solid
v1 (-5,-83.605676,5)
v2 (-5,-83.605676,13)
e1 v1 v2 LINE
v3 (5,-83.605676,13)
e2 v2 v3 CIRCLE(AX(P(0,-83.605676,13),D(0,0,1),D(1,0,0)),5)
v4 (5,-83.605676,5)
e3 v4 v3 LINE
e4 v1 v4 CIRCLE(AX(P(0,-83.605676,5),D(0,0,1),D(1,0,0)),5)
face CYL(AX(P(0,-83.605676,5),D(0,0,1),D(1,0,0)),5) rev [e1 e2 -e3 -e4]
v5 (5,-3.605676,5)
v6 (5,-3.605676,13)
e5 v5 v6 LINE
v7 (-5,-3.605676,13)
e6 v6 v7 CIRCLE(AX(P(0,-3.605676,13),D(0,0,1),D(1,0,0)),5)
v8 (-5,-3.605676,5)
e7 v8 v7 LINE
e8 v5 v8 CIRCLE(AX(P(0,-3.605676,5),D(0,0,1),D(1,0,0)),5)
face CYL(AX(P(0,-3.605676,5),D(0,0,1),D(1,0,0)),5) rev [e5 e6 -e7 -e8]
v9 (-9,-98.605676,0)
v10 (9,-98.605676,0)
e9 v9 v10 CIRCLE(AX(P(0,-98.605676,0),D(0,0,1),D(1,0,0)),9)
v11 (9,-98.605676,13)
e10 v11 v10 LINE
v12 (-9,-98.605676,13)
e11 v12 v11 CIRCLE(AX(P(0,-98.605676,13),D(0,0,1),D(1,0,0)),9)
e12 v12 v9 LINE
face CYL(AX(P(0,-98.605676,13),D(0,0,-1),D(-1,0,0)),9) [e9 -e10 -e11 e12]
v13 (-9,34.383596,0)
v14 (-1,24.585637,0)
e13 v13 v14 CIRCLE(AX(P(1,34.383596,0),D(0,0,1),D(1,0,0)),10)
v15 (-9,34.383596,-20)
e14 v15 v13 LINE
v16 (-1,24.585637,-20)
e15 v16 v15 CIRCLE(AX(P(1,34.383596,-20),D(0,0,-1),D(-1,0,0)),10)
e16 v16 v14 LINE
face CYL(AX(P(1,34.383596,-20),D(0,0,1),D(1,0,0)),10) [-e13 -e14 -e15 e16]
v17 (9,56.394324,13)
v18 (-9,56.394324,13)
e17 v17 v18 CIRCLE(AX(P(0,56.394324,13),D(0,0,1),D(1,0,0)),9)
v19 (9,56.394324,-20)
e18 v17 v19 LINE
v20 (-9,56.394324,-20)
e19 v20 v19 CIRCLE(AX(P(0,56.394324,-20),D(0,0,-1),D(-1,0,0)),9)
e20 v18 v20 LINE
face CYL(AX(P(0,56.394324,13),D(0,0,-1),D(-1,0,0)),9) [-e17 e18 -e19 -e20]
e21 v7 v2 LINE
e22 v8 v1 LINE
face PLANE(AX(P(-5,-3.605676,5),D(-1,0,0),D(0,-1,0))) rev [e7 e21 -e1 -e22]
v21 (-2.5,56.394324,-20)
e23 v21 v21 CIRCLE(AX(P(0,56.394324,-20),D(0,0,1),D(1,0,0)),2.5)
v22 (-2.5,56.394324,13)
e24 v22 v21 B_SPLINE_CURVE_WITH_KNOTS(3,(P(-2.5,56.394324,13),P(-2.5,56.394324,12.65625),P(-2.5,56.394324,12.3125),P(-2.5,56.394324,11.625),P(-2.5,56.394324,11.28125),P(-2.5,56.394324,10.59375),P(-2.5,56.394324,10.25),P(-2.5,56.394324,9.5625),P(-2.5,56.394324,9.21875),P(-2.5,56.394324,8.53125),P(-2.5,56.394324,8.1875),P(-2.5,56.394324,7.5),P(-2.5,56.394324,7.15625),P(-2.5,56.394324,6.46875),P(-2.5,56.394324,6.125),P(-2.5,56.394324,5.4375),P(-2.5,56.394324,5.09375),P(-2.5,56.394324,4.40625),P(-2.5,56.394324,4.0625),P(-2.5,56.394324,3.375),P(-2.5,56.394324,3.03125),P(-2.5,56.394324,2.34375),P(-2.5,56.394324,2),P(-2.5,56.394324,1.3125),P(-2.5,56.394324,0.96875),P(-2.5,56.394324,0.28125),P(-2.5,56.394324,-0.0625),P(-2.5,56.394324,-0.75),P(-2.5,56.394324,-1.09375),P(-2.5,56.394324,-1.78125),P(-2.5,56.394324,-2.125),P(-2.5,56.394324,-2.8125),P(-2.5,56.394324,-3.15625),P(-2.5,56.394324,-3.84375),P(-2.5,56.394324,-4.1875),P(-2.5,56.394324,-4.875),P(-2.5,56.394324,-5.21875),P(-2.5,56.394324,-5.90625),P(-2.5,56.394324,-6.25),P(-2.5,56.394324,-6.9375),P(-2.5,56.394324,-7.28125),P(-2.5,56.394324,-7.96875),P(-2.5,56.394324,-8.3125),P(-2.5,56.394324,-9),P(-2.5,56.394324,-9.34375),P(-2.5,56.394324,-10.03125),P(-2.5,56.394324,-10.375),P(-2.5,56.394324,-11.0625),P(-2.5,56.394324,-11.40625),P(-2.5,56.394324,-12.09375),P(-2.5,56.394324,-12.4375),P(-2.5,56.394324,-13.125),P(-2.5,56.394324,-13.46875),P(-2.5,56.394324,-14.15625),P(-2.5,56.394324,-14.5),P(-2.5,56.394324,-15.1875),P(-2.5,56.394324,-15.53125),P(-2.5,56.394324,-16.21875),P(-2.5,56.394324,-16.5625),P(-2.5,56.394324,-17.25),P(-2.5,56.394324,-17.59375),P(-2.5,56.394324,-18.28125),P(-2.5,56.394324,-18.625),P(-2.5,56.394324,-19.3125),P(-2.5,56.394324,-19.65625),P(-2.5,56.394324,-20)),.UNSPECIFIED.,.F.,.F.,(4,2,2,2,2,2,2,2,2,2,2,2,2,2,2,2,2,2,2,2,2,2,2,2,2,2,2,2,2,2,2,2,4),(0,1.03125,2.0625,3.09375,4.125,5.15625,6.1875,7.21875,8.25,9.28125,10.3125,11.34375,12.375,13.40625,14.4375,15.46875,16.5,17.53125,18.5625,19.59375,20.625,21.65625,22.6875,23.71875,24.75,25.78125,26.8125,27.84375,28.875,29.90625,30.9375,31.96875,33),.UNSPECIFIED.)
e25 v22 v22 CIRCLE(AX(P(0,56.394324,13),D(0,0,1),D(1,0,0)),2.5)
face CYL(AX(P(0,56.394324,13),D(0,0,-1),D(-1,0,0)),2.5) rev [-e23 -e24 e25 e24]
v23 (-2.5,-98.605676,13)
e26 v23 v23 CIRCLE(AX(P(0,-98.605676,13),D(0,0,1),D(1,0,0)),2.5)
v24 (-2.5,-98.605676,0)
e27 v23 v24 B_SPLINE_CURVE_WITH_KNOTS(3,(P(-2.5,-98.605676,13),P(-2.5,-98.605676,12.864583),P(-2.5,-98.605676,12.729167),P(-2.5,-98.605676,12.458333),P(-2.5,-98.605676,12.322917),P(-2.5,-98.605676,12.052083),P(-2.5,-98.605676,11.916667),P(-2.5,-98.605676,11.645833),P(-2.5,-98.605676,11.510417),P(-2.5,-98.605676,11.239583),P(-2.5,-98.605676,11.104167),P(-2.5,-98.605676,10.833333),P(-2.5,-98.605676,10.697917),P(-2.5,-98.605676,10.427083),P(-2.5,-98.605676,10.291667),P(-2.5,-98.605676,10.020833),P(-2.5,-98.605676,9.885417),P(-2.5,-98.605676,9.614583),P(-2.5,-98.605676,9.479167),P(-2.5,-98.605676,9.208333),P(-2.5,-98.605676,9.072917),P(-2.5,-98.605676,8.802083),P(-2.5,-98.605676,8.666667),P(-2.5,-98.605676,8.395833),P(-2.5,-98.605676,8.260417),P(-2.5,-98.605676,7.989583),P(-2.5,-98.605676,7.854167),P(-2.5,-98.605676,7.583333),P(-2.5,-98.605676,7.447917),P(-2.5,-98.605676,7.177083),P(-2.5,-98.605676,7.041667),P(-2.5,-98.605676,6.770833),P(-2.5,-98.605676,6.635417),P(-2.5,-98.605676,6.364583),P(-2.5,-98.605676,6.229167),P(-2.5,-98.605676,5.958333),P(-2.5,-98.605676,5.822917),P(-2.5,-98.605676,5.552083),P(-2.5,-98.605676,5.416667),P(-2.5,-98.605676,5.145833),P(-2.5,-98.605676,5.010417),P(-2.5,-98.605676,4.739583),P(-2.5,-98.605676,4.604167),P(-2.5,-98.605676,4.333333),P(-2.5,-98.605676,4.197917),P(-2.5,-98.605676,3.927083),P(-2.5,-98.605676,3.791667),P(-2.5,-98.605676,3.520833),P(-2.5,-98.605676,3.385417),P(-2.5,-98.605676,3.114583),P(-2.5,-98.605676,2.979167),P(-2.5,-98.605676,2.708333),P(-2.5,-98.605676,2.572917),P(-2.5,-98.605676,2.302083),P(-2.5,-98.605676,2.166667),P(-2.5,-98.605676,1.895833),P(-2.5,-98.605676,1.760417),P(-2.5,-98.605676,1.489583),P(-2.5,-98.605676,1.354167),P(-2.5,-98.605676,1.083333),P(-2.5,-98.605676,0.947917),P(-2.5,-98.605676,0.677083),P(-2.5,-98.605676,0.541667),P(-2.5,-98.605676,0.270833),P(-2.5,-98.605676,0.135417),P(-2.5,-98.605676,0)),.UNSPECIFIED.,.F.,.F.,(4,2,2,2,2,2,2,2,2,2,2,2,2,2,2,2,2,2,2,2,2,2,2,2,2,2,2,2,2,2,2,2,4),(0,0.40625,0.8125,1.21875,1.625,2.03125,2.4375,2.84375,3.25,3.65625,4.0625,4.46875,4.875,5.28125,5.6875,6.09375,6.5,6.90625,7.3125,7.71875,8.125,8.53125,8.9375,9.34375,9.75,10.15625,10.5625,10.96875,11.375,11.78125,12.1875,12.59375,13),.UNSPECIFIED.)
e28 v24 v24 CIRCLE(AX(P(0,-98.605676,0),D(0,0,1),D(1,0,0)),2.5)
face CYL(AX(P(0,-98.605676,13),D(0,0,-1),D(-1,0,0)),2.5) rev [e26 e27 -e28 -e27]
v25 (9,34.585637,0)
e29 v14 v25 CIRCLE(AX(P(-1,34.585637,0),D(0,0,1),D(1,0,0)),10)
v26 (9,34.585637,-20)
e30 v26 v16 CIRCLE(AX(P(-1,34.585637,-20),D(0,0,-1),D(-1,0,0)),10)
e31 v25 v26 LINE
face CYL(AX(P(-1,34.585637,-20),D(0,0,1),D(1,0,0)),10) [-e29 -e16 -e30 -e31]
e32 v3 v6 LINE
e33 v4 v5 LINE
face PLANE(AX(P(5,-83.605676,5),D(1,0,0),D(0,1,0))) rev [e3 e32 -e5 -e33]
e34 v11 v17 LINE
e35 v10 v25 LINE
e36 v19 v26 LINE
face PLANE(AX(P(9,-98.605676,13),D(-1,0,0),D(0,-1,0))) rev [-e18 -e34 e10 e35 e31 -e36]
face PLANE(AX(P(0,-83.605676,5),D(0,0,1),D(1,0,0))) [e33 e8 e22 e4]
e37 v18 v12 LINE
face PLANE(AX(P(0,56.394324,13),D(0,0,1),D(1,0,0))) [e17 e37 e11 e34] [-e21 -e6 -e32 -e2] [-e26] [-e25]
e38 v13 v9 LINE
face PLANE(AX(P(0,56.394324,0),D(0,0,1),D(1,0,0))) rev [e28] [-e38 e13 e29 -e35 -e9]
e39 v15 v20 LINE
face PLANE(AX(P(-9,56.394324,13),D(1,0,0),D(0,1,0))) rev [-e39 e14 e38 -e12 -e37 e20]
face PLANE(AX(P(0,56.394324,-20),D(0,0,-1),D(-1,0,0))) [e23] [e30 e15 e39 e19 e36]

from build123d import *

# Parameters (mm, degrees)
SKETCH1_R      = 2.5
EXTRUDE1_DEPTH = 13
EXTRUDE2_DEPTH = 8
EXTRUDE3_START = 20
EXTRUDE3_DEPTH = 20
FILLET1_R      = 10
FILLET2_R      = 10
SKETCH4_R      = 2.5
EXTRUDE4_DEPTH = 113.911387675


with BuildPart() as part:
    # Sketch1 → Extrude1 (new body)
    with BuildSketch(Plane.XY):
        with BuildLine():
            Line((-9, 56.394324189), (-9, -98.605675811))
            ThreePointArc((-9, -98.605675811), (0, -107.605675811), (9, -98.605675811))
            Line((9, -98.605675811), (9, 56.394324189))
            ThreePointArc((9, 56.394324189), (0, 65.394324189), (-9, 56.394324189))
        make_face()
        with Locations(Location((0, 56.394324189, 0), (0, 0, 180))):
            Circle(SKETCH1_R, mode=Mode.SUBTRACT)
        with Locations(Location((0, -98.605675811, 0), (0, 0, 180))):
            Circle(SKETCH1_R, mode=Mode.SUBTRACT)
    extrude(amount=EXTRUDE1_DEPTH)

    # Sketch2 → Extrude2 (cut)
    with BuildSketch(Plane.XY.offset(13)):
        with BuildLine():
            Line((-5, -3.605675811), (-5, -83.605675811))
            ThreePointArc((-5, -83.605675811), (0, -88.605675811), (5, -83.605675811))
            Line((5, -83.605675811), (5, -3.605675811))
            ThreePointArc((5, -3.605675811), (0, 1.394324189), (-5, -3.605675811))
        make_face()
    extrude(amount=-EXTRUDE2_DEPTH, mode=Mode.SUBTRACT)

    # Sketch3 → Extrude3 (add)
    with BuildSketch(Plane(origin=(0, 0, 0), x_dir=(-1, 0, 0), z_dir=(0, 0, -1)).offset(EXTRUDE3_START)):
        with BuildLine():
            Line((-9, 56.394324189), (-9, 24.585637313))
            Line((-9, 24.585637313), (9, 24.585637313))
            Line((9, 24.585637313), (9, 56.394324189))
            ThreePointArc((9, 56.394324189), (0, 65.394324189), (-9, 56.394324189))
        make_face()
    extrude(amount=-EXTRUDE3_DEPTH)

    # Fillet1
    fillet1_edges = [part.edges().sort_by_distance(p)[0] for p in [
        (9, 24.585637313, -10),
    ]]
    fillet(fillet1_edges, radius=FILLET1_R)

    # Fillet2
    # the kernel refuses this fillet: 10 mm, written as the material it takes off along each edge
    with BuildSketch(Plane(origin=(-9, 24.585637313, -44.494897428), x_dir=(0, 1, 0), z_dir=(0, 0, 1))) as fillet2_piece_1:
        with BuildLine():
            CenterArc((9.797958971, -10), FILLET2_R, 90, 78.463040967)
            Line((0, -8), (-0.195959179, -7.96))
            ThreePointArc((-0.195959179, -7.96), (-0.2, -4), (-0.2, 0))
            Line((-0.2, 0), (0, 0.2))
            Line((0, 0.2), (9.797958971, 0.2))
            Line((9.797958971, 0.2), (9.797958971, 0))
        make_face()
    extrude(amount=44.494897428, mode=Mode.SUBTRACT)

    # Sketch4 → Extrude4 (cut, through all)
    with BuildSketch(Plane.XY.offset(13)):
        with Locations(Location((0, 56.394324189, 0), (0, 0, 180))):
            Circle(SKETCH4_R)
    extrude(amount=-EXTRUDE4_DEPTH, mode=Mode.SUBTRACT)


solid = part.part
